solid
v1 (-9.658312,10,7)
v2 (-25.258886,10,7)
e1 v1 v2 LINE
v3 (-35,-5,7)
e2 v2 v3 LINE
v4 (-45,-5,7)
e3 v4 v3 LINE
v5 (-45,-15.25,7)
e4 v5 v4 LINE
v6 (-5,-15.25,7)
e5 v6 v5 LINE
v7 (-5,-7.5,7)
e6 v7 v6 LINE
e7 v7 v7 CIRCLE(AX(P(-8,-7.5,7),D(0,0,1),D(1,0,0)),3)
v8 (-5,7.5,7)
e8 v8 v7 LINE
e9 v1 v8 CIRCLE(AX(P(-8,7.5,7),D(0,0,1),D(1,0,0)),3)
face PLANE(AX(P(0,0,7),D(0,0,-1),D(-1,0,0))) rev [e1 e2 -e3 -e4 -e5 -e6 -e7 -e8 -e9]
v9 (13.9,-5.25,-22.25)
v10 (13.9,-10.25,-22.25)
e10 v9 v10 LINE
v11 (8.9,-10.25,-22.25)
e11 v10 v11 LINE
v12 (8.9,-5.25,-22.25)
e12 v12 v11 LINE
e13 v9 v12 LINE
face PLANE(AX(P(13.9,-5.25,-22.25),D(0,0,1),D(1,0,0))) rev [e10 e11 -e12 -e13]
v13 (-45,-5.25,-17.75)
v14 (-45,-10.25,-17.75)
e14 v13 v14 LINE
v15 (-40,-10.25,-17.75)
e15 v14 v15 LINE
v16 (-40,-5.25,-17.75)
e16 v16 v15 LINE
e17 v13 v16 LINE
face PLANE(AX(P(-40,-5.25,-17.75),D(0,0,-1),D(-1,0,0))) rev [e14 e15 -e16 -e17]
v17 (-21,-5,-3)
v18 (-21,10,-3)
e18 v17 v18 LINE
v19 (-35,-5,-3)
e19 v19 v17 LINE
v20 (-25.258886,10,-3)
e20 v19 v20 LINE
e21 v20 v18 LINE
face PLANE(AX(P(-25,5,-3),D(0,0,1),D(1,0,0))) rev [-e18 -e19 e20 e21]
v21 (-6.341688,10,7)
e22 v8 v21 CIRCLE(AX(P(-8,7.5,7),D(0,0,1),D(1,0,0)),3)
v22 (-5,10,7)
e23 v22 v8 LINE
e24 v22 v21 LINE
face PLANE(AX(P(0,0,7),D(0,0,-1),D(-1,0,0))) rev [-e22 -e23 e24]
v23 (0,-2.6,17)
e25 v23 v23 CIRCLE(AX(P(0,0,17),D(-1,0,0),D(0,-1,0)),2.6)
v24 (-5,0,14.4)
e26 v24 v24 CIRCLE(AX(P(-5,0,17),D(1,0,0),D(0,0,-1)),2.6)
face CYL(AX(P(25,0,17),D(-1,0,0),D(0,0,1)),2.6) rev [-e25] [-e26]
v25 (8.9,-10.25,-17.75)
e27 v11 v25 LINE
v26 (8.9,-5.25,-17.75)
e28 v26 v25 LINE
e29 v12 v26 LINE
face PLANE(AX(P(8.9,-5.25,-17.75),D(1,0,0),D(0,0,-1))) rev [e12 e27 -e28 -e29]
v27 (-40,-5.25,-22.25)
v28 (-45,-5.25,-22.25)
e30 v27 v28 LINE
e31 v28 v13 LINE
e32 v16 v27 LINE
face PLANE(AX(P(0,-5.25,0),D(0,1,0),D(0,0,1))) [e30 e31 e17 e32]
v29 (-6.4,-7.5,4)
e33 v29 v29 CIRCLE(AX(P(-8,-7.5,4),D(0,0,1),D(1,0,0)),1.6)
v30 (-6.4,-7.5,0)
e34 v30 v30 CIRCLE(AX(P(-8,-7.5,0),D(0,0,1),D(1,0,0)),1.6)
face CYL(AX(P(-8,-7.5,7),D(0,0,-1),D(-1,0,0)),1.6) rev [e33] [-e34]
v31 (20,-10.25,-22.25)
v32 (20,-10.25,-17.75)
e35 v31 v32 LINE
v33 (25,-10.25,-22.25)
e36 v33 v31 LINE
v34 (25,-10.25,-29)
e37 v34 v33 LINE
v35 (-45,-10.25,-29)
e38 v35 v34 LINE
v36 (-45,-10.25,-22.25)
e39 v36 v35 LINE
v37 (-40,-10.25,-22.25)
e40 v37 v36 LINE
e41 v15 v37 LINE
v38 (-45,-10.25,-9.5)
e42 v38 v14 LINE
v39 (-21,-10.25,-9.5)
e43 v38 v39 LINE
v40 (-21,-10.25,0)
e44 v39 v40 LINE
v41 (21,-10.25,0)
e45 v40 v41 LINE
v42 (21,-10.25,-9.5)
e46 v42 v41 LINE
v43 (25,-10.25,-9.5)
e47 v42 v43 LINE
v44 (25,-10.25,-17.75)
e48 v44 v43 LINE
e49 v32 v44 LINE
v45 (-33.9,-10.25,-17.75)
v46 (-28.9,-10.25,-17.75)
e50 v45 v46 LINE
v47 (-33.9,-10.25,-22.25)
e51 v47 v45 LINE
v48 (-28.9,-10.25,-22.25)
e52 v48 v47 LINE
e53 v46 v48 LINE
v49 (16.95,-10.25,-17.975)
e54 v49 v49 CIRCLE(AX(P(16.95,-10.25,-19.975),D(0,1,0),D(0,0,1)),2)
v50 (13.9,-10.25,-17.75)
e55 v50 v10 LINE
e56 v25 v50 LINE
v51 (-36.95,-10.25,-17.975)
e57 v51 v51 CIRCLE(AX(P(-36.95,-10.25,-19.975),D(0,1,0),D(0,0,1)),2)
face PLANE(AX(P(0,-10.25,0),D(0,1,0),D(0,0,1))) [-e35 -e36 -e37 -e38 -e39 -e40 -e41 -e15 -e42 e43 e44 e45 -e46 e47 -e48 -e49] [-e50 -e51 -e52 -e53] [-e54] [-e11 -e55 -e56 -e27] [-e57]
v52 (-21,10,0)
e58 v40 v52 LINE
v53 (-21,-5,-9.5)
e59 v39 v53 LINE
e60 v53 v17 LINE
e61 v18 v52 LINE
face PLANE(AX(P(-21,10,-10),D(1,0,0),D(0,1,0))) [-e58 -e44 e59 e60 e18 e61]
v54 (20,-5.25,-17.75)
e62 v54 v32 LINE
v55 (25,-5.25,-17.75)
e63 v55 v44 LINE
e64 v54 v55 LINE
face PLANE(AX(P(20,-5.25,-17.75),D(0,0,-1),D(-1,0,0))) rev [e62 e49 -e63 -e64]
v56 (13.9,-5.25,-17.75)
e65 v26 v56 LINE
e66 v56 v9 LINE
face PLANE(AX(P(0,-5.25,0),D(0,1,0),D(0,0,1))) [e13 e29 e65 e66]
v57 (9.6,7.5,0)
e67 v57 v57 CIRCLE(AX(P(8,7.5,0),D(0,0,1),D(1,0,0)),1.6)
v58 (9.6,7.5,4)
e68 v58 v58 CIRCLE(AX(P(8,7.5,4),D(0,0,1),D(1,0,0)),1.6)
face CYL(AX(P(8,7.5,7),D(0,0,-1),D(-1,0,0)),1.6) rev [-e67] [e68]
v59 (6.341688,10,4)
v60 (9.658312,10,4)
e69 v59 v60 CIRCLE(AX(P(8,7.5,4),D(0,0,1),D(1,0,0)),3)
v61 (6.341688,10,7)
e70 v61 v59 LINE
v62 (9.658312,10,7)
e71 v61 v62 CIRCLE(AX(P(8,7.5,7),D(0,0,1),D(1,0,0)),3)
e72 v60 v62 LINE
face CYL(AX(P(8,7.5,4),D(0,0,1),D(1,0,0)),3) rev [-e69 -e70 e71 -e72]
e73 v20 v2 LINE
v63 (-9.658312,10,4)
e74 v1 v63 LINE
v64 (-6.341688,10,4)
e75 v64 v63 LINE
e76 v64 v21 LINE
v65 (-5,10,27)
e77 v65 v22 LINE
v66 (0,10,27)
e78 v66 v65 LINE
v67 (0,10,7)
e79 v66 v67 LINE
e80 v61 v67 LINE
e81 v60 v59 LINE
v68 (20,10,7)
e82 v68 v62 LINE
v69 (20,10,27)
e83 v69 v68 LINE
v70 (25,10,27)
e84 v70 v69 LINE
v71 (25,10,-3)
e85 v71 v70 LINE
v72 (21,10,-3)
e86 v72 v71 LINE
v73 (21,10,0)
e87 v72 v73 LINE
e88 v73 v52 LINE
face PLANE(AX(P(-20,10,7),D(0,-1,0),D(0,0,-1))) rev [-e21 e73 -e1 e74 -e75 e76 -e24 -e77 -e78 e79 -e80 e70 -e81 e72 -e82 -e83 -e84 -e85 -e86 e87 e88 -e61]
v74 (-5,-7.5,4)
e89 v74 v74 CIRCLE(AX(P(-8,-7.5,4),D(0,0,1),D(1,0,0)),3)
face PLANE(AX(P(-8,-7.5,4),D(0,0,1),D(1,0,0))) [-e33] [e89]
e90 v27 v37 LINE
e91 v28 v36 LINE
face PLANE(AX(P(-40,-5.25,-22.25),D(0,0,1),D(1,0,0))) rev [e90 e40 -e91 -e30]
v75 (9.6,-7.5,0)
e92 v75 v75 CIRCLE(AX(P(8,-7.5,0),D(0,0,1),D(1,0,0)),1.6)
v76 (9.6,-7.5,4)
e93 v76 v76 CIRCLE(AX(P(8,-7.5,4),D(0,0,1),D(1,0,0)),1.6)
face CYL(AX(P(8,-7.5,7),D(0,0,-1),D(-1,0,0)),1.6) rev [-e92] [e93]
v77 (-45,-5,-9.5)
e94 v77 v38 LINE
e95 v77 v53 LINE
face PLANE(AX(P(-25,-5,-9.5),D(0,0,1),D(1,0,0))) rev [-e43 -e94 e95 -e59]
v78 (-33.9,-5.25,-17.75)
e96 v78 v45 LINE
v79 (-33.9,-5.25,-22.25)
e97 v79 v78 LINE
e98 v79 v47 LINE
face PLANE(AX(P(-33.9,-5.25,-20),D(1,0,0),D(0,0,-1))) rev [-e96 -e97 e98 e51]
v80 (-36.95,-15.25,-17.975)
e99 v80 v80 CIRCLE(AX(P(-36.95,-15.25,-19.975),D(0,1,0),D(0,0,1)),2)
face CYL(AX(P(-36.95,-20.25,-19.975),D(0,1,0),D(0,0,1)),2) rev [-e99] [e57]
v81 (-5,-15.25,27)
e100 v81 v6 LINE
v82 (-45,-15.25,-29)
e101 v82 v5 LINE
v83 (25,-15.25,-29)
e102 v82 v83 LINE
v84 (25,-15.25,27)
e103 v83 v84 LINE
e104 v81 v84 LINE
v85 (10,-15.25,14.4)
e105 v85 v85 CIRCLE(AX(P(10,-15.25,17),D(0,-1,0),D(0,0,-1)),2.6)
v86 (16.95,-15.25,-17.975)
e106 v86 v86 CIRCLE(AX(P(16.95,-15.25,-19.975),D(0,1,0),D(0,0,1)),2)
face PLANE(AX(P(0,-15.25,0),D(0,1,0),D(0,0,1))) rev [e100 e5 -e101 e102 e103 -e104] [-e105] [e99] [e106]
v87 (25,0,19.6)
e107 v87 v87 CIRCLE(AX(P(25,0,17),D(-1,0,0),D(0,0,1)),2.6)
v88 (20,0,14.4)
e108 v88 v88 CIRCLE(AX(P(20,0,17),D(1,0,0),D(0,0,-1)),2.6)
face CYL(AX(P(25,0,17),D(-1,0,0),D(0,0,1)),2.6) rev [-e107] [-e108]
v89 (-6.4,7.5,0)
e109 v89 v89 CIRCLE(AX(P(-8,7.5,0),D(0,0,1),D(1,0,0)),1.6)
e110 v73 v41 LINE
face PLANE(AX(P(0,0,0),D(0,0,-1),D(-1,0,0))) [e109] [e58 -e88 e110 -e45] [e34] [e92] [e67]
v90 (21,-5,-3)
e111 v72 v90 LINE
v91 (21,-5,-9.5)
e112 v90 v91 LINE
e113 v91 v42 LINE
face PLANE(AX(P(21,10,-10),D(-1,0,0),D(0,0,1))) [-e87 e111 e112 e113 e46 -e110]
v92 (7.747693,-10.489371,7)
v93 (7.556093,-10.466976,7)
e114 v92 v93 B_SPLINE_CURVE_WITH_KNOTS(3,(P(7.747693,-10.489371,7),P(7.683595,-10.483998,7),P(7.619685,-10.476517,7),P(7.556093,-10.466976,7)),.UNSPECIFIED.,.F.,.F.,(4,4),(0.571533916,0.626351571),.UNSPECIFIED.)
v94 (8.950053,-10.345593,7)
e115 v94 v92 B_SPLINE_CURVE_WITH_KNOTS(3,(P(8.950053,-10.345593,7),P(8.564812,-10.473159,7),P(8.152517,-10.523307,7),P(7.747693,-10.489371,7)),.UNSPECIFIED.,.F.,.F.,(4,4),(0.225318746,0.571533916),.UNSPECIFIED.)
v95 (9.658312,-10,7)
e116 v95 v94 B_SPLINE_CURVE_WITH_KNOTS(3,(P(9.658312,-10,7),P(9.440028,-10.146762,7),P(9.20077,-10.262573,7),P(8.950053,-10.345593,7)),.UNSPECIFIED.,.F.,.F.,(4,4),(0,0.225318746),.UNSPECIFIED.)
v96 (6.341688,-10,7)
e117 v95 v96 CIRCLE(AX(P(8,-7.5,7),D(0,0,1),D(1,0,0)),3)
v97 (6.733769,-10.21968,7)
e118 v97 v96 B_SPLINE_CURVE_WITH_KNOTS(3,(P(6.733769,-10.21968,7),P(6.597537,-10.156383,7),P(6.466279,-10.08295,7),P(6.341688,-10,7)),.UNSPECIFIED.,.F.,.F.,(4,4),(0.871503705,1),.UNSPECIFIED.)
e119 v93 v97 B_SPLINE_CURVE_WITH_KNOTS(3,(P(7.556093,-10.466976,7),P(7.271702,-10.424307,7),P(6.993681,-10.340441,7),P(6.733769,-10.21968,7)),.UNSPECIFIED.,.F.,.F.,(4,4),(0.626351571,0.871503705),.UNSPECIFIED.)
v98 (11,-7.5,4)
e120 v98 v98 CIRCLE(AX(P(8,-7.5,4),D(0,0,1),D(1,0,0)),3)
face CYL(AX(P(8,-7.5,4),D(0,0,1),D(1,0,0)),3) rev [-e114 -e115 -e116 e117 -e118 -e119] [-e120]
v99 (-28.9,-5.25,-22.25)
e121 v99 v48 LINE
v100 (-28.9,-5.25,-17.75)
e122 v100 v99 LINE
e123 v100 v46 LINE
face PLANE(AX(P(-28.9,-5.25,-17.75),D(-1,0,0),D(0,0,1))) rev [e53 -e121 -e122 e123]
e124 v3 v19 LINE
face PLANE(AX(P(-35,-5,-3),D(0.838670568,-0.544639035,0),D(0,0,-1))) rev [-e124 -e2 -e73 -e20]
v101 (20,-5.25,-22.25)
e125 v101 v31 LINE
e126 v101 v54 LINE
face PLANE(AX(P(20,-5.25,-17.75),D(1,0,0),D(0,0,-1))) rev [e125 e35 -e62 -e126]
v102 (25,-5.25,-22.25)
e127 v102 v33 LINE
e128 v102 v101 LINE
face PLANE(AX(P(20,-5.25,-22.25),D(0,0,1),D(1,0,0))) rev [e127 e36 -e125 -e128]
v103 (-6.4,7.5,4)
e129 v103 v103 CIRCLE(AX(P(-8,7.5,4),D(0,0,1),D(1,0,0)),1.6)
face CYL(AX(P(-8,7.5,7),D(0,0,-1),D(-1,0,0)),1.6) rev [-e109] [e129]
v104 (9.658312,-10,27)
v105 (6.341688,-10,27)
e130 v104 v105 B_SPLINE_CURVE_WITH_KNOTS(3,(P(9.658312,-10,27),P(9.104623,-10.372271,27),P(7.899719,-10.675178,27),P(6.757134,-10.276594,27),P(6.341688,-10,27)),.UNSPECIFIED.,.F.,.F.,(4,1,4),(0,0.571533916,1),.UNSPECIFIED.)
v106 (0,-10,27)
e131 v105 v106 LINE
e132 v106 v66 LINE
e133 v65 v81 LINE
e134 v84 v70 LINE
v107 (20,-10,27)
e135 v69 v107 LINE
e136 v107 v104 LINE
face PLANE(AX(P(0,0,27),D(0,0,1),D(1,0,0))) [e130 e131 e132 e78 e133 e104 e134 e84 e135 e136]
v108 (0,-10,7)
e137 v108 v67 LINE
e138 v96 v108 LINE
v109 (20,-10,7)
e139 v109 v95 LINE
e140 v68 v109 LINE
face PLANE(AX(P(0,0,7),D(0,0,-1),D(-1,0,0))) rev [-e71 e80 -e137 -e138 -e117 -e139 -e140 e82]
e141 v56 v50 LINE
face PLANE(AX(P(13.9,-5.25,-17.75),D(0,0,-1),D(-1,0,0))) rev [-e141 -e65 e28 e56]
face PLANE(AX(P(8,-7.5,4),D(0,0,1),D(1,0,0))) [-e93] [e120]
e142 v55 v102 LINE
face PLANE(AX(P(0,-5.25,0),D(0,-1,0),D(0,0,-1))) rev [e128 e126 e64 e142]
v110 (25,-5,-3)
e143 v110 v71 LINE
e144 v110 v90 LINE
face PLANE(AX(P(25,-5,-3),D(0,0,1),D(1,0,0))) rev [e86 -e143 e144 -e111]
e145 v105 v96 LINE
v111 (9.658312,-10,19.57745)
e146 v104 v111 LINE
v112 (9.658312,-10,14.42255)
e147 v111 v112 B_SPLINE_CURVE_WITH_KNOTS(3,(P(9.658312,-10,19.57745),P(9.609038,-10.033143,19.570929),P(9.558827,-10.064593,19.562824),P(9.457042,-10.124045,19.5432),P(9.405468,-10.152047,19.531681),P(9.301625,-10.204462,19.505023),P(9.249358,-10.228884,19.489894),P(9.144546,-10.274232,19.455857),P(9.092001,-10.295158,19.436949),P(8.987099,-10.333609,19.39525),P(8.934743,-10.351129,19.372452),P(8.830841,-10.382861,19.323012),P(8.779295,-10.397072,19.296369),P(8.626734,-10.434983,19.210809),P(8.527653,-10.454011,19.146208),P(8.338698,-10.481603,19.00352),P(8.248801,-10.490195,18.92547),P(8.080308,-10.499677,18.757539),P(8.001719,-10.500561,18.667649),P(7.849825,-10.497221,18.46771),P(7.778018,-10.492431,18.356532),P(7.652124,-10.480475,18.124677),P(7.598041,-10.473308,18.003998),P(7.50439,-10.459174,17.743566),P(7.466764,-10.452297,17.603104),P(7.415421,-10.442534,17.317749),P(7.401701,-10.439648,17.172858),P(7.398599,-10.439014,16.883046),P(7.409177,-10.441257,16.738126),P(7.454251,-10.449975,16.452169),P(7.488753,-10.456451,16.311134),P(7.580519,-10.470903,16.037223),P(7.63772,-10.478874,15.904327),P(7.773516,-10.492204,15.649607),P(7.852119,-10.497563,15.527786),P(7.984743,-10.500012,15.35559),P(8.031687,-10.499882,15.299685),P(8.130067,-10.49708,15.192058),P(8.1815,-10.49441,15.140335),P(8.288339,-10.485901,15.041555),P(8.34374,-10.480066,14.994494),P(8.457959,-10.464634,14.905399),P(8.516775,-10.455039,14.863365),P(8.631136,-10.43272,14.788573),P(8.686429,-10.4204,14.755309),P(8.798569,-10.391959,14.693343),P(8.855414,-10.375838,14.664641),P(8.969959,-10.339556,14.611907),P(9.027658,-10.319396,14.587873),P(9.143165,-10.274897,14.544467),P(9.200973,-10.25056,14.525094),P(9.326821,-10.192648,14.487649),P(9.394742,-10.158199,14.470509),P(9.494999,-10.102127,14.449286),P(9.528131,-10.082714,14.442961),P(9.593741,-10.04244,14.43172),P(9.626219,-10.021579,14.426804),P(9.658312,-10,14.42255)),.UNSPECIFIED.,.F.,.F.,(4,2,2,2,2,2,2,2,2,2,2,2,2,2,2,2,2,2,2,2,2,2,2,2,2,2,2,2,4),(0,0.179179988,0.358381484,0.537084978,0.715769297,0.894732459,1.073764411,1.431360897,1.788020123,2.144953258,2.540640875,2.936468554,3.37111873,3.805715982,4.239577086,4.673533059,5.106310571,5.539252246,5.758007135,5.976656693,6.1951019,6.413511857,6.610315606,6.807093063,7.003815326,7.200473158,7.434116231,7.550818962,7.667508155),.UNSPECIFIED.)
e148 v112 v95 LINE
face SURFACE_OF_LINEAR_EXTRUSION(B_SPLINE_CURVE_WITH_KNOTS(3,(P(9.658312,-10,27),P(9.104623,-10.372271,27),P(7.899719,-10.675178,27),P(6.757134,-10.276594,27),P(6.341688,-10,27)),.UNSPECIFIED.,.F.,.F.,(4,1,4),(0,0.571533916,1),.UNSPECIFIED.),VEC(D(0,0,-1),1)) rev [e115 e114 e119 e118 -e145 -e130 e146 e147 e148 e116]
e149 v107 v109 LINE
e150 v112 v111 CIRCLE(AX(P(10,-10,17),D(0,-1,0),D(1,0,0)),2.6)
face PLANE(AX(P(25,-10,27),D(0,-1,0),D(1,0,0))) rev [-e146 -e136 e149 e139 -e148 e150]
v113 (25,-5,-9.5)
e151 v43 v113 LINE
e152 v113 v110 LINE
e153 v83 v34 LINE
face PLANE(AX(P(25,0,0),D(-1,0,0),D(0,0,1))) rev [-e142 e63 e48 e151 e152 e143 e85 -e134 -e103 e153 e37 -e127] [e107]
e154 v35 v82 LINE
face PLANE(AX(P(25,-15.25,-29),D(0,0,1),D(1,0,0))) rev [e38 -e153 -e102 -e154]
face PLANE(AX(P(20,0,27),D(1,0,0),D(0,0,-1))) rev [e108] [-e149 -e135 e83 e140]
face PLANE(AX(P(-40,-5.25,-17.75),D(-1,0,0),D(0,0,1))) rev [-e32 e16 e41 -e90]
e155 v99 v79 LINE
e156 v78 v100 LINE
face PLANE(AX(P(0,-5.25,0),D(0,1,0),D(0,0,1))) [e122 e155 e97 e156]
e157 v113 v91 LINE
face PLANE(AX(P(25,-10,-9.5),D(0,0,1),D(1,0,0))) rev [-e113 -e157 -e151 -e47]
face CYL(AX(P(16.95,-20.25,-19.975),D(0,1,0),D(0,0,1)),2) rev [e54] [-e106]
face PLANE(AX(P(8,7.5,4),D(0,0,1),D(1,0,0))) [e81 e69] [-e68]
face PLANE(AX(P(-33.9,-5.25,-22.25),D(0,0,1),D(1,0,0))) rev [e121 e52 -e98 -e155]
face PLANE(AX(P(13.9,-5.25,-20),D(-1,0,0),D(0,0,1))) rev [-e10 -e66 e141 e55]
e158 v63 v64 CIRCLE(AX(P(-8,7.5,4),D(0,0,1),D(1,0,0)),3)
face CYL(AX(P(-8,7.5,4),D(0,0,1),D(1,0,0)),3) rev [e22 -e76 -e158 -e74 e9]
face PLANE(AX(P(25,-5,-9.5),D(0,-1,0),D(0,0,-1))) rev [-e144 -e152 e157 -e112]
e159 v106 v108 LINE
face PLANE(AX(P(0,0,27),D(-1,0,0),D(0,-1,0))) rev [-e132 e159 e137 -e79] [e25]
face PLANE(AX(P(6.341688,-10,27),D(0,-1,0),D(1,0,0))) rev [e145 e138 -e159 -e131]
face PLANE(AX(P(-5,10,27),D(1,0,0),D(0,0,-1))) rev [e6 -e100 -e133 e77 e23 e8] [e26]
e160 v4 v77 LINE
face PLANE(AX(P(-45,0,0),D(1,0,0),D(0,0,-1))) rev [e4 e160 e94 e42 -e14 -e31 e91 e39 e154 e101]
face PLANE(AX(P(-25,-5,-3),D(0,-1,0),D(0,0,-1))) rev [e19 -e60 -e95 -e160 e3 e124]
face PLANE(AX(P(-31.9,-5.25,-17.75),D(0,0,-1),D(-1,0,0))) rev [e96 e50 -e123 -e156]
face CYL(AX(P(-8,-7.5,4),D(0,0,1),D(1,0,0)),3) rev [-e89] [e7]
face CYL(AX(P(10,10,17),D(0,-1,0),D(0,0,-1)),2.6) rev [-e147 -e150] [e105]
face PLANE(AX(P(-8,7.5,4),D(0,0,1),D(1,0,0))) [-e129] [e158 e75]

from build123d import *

# Parameters (mm, degrees)
SKETCH1_W           = 40
SKETCH1_H           = 20
SKETCH1_R           = 1.6
BOSS_EXTRUDE1_DEPTH = 7
BOSS_EXTRUDE2_DEPTH = 5
BOSS_EXTRUDE3_DEPTH = 5
BOSS_EXTRUDE4_DEPTH = 0.25
SKETCH5_W           = 50
SKETCH5_H           = 36
BOSS_EXTRUDE5_DEPTH = 5
SKETCH6_R           = 3
CUT_EXTRUDE1_DEPTH  = 3
BOSS_EXTRUDE6_DEPTH = 20
BOSS_EXTRUDE7_DEPTH = 5
BOSS_EXTRUDE8_DEPTH = 20
SKETCH10_R          = 2.6
CUT_EXTRUDE2_DEPTH  = 60.779281528
BOSS_EXTRUDE9_DEPTH = 20
SKETCH12_R          = 2.6
CUT_EXTRUDE3_DEPTH  = 60.190898836
SKETCH13_W          = 5
SKETCH13_H          = 5
CUT_EXTRUDE4_DEPTH  = 6.5
CHAMFER1_SIZE       = 15.398649638
CHAMFER1_SIZE_2     = 10
SKETCH14_W          = 1
SKETCH14_H          = 20.25
CUT_EXTRUDE5_DEPTH  = 10
SKETCH15_R          = 2
CUT_EXTRUDE6_DEPTH  = 10


with BuildPart() as part:
    # Sketch1 → Boss-Extrude1 (new body)
    with BuildSketch(Plane.XY):
        Rectangle(SKETCH1_W, SKETCH1_H)
        with Locations((-8, 7.5)):
            Circle(SKETCH1_R, mode=Mode.SUBTRACT)
        with Locations((8, 7.5)):
            Circle(SKETCH1_R, mode=Mode.SUBTRACT)
        with Locations((8, -7.5)):
            Circle(SKETCH1_R, mode=Mode.SUBTRACT)
        with Locations((-8, -7.5)):
            Circle(SKETCH1_R, mode=Mode.SUBTRACT)
    extrude(amount=BOSS_EXTRUDE1_DEPTH)

    # Sketch2 → Boss-Extrude2 (add)
    with BuildSketch(Plane(origin=(20, 0, 0), x_dir=(0, 0, -1), z_dir=(1, 0, 0))):
        Polygon((3, -5), (3, 5), (9.5, 5), (9.5, 10), (0, 10), (-7, 10), (-7, -10), (0, -10), (9.5, -10), (9.5, -5), align=None)
    extrude(amount=BOSS_EXTRUDE2_DEPTH)

    # Sketch3 → Boss-Extrude3 (add)
    with BuildSketch(Plane.ZY.offset(20)):
        Polygon((7, 10), (-9.5, 10), (-9.5, 5), (-3, 5), (-3, -5), (-9.5, -5), (-9.5, -10), (7, -10), align=None)
    extrude(amount=BOSS_EXTRUDE3_DEPTH)

    # Sketch4 → Boss-Extrude4 (add)
    with BuildSketch(Plane.XZ.offset(10)):
        Polygon((-25, 7), (-25, -9.5), (-20, -9.5), (-20, 0), (20, 0), (20, -9.5), (25, -9.5), (25, 7), align=None)
    extrude(amount=BOSS_EXTRUDE4_DEPTH)

    # Sketch5 → Boss-Extrude5 (add)
    with BuildSketch(Plane.XZ.offset(10.25)):
        with Locations((0, -11)):
            Rectangle(SKETCH5_W, SKETCH5_H)
    extrude(amount=BOSS_EXTRUDE5_DEPTH)

    # Sketch6 → Cut-Extrude1 (cut)
    with BuildSketch(Plane.XY.offset(7)):
        with Locations((-8, 7.5)):
            Circle(SKETCH6_R)
        with Locations((-8, -7.5)):
            Circle(SKETCH6_R)
        with Locations((8, -7.5)):
            Circle(SKETCH6_R)
        with Locations((8, 7.5)):
            Circle(SKETCH6_R)
    extrude(amount=-CUT_EXTRUDE1_DEPTH, mode=Mode.SUBTRACT)

    # Sketch7 → Boss-Extrude6 (add)
    with BuildSketch(Plane.ZY.offset(25)):
        Polygon((-3, -5), (7, -5), (7, -15.25), (-29, -15.25), (-29, -10.25), (-9.5, -10.25), (-9.5, -5), align=None)
    extrude(amount=BOSS_EXTRUDE6_DEPTH)

    # Sketch8 → Boss-Extrude7 (add)
    with BuildSketch(Plane(origin=(0, -10.25, 0), x_dir=(1, 0, 0), z_dir=(0, 1, 0))):
        Polygon((20, 17.75), (20, 22.25), (25, 22.25), (25, 17.75), (22, 17.75), align=None)
        Polygon((13.9, 20), (13.9, 17.75), (11.9, 17.75), (8.9, 17.75), (8.9, 22.25), (13.9, 22.25), align=None)
        Polygon((-28.9, 17.75), (-28.9, 22.25), (-33.9, 22.25), (-33.9, 20), (-33.9, 17.75), (-31.9, 17.75), align=None)
        Polygon((-45, 17.75), (-42, 17.75), (-40, 17.75), (-40, 22.25), (-45, 22.25), align=None)
    extrude(amount=BOSS_EXTRUDE7_DEPTH)

    # Sketch9 → Boss-Extrude8 (add)
    with BuildSketch(Plane.XY.offset(7)):
        Polygon((0, 0), (0, 10), (-5, 10), (-5, -10), (0, -10), align=None)
        Polygon((20, 0), (20, 10), (25, 10), (25, -10), (20, -10), align=None)
    extrude(amount=BOSS_EXTRUDE8_DEPTH)

    # Sketch10 → Cut-Extrude2 (cut, through all)
    with BuildSketch(Plane.ZY.offset(25)):
        with Locations(Location((17, 0, 0), (0, 0, 270))):
            Circle(SKETCH10_R)
    extrude(amount=-CUT_EXTRUDE2_DEPTH, mode=Mode.SUBTRACT)

    # Sketch11 → Boss-Extrude9 (add, through all)
    with BuildSketch(Plane.XY.offset(7)):
        with BuildLine():
            Line((25, -15.25), (25, -10))
            Line((25, -10), (10, -10))
            Line((10, -10), (9.658312395, -10))
            add(Edge.make_bspline(
                [(9.658312395, -10), (9.104622692, -10.372271133), (7.89971927, -10.67517784), (6.757134286, -10.276593696), (6.341687605, -10)],
                knots=[0, 0, 0, 0, 0.571533916, 1, 1, 1, 1], degree=3))
            Line((6.341687605, -10), (-5, -10))
            Line((-5, -10), (-5, -15.25))
            Line((-5, -15.25), (25, -15.25))
        make_face()
    extrude(amount=BOSS_EXTRUDE9_DEPTH)

    # Sketch12 → Cut-Extrude3 (cut, through all)
    with BuildSketch(Plane.XZ.offset(15.25)):
        with Locations(Location((10, 17, 0), (0, 0, 270))):
            Circle(SKETCH12_R)
    extrude(amount=-CUT_EXTRUDE3_DEPTH, mode=Mode.SUBTRACT)

    # Sketch13 → Cut-Extrude4 (cut)
    with BuildSketch(Plane(origin=(0, 0, -9.5), x_dir=(-1, 0, 0), z_dir=(0, 0, -1))):
        with Locations((22.5, 7.5)):
            Rectangle(SKETCH13_W, SKETCH13_H)
        with Locations((-22.5, 7.5)):
            Rectangle(SKETCH13_W, SKETCH13_H)
    extrude(amount=-CUT_EXTRUDE4_DEPTH, mode=Mode.SUBTRACT)

    # Chamfer1
    # the kernel refuses this chamfer: 15.398649638, 10 mm, written as the material it adds along each edge
    with BuildSketch(Plane(origin=(-25, -5, 7), x_dir=(0.021073765466273167, 0.9997779235455604, 0), z_dir=(0, 0, -1))) as chamfer1_piece_1_section:
        Polygon((CHAMFER1_SIZE * 0.999777923555, -CHAMFER1_SIZE * 0.0210737654665), (-CHAMFER1_SIZE_2 * 0.0210737654663, -CHAMFER1_SIZE_2 * 0.999777923546), (0, 0), align=None)
    chamfer1_piece_1 = extrude(amount=10, mode=Mode.PRIVATE)
    chamfer1_piece_1 = split(chamfer1_piece_1, bisect_by=Plane(origin=(-28.252881362, 10, 2), z_dir=(0, -1, 0)), keep=Keep.TOP, mode=Mode.PRIVATE)
    add(chamfer1_piece_1)

    # Sketch14 → Cut-Extrude5 (cut)
    with BuildSketch(Plane(origin=(0, 0, 0), x_dir=(-1, 0, 0), z_dir=(0, 0, -1))):
        with Locations((20.5, -0.125)):
            Rectangle(SKETCH14_W, SKETCH14_H)
        with Locations((-20.5, -0.125)):
            Rectangle(SKETCH14_W, SKETCH14_H)
    extrude(amount=CUT_EXTRUDE5_DEPTH, mode=Mode.SUBTRACT)

    # Sketch15 → Cut-Extrude6 (cut)
    with BuildSketch(Plane(origin=(0, -10.25, 0), x_dir=(1, 0, 0), z_dir=(0, 1, 0))):
        with Locations(Location((16.95, 19.975, 0), (0, 0, 270))):
            Circle(SKETCH15_R)
        with Locations(Location((-36.95, 19.975, 0), (0, 0, 270))):
            Circle(SKETCH15_R)
    extrude(amount=-CUT_EXTRUDE6_DEPTH, mode=Mode.SUBTRACT)


solid = part.part
